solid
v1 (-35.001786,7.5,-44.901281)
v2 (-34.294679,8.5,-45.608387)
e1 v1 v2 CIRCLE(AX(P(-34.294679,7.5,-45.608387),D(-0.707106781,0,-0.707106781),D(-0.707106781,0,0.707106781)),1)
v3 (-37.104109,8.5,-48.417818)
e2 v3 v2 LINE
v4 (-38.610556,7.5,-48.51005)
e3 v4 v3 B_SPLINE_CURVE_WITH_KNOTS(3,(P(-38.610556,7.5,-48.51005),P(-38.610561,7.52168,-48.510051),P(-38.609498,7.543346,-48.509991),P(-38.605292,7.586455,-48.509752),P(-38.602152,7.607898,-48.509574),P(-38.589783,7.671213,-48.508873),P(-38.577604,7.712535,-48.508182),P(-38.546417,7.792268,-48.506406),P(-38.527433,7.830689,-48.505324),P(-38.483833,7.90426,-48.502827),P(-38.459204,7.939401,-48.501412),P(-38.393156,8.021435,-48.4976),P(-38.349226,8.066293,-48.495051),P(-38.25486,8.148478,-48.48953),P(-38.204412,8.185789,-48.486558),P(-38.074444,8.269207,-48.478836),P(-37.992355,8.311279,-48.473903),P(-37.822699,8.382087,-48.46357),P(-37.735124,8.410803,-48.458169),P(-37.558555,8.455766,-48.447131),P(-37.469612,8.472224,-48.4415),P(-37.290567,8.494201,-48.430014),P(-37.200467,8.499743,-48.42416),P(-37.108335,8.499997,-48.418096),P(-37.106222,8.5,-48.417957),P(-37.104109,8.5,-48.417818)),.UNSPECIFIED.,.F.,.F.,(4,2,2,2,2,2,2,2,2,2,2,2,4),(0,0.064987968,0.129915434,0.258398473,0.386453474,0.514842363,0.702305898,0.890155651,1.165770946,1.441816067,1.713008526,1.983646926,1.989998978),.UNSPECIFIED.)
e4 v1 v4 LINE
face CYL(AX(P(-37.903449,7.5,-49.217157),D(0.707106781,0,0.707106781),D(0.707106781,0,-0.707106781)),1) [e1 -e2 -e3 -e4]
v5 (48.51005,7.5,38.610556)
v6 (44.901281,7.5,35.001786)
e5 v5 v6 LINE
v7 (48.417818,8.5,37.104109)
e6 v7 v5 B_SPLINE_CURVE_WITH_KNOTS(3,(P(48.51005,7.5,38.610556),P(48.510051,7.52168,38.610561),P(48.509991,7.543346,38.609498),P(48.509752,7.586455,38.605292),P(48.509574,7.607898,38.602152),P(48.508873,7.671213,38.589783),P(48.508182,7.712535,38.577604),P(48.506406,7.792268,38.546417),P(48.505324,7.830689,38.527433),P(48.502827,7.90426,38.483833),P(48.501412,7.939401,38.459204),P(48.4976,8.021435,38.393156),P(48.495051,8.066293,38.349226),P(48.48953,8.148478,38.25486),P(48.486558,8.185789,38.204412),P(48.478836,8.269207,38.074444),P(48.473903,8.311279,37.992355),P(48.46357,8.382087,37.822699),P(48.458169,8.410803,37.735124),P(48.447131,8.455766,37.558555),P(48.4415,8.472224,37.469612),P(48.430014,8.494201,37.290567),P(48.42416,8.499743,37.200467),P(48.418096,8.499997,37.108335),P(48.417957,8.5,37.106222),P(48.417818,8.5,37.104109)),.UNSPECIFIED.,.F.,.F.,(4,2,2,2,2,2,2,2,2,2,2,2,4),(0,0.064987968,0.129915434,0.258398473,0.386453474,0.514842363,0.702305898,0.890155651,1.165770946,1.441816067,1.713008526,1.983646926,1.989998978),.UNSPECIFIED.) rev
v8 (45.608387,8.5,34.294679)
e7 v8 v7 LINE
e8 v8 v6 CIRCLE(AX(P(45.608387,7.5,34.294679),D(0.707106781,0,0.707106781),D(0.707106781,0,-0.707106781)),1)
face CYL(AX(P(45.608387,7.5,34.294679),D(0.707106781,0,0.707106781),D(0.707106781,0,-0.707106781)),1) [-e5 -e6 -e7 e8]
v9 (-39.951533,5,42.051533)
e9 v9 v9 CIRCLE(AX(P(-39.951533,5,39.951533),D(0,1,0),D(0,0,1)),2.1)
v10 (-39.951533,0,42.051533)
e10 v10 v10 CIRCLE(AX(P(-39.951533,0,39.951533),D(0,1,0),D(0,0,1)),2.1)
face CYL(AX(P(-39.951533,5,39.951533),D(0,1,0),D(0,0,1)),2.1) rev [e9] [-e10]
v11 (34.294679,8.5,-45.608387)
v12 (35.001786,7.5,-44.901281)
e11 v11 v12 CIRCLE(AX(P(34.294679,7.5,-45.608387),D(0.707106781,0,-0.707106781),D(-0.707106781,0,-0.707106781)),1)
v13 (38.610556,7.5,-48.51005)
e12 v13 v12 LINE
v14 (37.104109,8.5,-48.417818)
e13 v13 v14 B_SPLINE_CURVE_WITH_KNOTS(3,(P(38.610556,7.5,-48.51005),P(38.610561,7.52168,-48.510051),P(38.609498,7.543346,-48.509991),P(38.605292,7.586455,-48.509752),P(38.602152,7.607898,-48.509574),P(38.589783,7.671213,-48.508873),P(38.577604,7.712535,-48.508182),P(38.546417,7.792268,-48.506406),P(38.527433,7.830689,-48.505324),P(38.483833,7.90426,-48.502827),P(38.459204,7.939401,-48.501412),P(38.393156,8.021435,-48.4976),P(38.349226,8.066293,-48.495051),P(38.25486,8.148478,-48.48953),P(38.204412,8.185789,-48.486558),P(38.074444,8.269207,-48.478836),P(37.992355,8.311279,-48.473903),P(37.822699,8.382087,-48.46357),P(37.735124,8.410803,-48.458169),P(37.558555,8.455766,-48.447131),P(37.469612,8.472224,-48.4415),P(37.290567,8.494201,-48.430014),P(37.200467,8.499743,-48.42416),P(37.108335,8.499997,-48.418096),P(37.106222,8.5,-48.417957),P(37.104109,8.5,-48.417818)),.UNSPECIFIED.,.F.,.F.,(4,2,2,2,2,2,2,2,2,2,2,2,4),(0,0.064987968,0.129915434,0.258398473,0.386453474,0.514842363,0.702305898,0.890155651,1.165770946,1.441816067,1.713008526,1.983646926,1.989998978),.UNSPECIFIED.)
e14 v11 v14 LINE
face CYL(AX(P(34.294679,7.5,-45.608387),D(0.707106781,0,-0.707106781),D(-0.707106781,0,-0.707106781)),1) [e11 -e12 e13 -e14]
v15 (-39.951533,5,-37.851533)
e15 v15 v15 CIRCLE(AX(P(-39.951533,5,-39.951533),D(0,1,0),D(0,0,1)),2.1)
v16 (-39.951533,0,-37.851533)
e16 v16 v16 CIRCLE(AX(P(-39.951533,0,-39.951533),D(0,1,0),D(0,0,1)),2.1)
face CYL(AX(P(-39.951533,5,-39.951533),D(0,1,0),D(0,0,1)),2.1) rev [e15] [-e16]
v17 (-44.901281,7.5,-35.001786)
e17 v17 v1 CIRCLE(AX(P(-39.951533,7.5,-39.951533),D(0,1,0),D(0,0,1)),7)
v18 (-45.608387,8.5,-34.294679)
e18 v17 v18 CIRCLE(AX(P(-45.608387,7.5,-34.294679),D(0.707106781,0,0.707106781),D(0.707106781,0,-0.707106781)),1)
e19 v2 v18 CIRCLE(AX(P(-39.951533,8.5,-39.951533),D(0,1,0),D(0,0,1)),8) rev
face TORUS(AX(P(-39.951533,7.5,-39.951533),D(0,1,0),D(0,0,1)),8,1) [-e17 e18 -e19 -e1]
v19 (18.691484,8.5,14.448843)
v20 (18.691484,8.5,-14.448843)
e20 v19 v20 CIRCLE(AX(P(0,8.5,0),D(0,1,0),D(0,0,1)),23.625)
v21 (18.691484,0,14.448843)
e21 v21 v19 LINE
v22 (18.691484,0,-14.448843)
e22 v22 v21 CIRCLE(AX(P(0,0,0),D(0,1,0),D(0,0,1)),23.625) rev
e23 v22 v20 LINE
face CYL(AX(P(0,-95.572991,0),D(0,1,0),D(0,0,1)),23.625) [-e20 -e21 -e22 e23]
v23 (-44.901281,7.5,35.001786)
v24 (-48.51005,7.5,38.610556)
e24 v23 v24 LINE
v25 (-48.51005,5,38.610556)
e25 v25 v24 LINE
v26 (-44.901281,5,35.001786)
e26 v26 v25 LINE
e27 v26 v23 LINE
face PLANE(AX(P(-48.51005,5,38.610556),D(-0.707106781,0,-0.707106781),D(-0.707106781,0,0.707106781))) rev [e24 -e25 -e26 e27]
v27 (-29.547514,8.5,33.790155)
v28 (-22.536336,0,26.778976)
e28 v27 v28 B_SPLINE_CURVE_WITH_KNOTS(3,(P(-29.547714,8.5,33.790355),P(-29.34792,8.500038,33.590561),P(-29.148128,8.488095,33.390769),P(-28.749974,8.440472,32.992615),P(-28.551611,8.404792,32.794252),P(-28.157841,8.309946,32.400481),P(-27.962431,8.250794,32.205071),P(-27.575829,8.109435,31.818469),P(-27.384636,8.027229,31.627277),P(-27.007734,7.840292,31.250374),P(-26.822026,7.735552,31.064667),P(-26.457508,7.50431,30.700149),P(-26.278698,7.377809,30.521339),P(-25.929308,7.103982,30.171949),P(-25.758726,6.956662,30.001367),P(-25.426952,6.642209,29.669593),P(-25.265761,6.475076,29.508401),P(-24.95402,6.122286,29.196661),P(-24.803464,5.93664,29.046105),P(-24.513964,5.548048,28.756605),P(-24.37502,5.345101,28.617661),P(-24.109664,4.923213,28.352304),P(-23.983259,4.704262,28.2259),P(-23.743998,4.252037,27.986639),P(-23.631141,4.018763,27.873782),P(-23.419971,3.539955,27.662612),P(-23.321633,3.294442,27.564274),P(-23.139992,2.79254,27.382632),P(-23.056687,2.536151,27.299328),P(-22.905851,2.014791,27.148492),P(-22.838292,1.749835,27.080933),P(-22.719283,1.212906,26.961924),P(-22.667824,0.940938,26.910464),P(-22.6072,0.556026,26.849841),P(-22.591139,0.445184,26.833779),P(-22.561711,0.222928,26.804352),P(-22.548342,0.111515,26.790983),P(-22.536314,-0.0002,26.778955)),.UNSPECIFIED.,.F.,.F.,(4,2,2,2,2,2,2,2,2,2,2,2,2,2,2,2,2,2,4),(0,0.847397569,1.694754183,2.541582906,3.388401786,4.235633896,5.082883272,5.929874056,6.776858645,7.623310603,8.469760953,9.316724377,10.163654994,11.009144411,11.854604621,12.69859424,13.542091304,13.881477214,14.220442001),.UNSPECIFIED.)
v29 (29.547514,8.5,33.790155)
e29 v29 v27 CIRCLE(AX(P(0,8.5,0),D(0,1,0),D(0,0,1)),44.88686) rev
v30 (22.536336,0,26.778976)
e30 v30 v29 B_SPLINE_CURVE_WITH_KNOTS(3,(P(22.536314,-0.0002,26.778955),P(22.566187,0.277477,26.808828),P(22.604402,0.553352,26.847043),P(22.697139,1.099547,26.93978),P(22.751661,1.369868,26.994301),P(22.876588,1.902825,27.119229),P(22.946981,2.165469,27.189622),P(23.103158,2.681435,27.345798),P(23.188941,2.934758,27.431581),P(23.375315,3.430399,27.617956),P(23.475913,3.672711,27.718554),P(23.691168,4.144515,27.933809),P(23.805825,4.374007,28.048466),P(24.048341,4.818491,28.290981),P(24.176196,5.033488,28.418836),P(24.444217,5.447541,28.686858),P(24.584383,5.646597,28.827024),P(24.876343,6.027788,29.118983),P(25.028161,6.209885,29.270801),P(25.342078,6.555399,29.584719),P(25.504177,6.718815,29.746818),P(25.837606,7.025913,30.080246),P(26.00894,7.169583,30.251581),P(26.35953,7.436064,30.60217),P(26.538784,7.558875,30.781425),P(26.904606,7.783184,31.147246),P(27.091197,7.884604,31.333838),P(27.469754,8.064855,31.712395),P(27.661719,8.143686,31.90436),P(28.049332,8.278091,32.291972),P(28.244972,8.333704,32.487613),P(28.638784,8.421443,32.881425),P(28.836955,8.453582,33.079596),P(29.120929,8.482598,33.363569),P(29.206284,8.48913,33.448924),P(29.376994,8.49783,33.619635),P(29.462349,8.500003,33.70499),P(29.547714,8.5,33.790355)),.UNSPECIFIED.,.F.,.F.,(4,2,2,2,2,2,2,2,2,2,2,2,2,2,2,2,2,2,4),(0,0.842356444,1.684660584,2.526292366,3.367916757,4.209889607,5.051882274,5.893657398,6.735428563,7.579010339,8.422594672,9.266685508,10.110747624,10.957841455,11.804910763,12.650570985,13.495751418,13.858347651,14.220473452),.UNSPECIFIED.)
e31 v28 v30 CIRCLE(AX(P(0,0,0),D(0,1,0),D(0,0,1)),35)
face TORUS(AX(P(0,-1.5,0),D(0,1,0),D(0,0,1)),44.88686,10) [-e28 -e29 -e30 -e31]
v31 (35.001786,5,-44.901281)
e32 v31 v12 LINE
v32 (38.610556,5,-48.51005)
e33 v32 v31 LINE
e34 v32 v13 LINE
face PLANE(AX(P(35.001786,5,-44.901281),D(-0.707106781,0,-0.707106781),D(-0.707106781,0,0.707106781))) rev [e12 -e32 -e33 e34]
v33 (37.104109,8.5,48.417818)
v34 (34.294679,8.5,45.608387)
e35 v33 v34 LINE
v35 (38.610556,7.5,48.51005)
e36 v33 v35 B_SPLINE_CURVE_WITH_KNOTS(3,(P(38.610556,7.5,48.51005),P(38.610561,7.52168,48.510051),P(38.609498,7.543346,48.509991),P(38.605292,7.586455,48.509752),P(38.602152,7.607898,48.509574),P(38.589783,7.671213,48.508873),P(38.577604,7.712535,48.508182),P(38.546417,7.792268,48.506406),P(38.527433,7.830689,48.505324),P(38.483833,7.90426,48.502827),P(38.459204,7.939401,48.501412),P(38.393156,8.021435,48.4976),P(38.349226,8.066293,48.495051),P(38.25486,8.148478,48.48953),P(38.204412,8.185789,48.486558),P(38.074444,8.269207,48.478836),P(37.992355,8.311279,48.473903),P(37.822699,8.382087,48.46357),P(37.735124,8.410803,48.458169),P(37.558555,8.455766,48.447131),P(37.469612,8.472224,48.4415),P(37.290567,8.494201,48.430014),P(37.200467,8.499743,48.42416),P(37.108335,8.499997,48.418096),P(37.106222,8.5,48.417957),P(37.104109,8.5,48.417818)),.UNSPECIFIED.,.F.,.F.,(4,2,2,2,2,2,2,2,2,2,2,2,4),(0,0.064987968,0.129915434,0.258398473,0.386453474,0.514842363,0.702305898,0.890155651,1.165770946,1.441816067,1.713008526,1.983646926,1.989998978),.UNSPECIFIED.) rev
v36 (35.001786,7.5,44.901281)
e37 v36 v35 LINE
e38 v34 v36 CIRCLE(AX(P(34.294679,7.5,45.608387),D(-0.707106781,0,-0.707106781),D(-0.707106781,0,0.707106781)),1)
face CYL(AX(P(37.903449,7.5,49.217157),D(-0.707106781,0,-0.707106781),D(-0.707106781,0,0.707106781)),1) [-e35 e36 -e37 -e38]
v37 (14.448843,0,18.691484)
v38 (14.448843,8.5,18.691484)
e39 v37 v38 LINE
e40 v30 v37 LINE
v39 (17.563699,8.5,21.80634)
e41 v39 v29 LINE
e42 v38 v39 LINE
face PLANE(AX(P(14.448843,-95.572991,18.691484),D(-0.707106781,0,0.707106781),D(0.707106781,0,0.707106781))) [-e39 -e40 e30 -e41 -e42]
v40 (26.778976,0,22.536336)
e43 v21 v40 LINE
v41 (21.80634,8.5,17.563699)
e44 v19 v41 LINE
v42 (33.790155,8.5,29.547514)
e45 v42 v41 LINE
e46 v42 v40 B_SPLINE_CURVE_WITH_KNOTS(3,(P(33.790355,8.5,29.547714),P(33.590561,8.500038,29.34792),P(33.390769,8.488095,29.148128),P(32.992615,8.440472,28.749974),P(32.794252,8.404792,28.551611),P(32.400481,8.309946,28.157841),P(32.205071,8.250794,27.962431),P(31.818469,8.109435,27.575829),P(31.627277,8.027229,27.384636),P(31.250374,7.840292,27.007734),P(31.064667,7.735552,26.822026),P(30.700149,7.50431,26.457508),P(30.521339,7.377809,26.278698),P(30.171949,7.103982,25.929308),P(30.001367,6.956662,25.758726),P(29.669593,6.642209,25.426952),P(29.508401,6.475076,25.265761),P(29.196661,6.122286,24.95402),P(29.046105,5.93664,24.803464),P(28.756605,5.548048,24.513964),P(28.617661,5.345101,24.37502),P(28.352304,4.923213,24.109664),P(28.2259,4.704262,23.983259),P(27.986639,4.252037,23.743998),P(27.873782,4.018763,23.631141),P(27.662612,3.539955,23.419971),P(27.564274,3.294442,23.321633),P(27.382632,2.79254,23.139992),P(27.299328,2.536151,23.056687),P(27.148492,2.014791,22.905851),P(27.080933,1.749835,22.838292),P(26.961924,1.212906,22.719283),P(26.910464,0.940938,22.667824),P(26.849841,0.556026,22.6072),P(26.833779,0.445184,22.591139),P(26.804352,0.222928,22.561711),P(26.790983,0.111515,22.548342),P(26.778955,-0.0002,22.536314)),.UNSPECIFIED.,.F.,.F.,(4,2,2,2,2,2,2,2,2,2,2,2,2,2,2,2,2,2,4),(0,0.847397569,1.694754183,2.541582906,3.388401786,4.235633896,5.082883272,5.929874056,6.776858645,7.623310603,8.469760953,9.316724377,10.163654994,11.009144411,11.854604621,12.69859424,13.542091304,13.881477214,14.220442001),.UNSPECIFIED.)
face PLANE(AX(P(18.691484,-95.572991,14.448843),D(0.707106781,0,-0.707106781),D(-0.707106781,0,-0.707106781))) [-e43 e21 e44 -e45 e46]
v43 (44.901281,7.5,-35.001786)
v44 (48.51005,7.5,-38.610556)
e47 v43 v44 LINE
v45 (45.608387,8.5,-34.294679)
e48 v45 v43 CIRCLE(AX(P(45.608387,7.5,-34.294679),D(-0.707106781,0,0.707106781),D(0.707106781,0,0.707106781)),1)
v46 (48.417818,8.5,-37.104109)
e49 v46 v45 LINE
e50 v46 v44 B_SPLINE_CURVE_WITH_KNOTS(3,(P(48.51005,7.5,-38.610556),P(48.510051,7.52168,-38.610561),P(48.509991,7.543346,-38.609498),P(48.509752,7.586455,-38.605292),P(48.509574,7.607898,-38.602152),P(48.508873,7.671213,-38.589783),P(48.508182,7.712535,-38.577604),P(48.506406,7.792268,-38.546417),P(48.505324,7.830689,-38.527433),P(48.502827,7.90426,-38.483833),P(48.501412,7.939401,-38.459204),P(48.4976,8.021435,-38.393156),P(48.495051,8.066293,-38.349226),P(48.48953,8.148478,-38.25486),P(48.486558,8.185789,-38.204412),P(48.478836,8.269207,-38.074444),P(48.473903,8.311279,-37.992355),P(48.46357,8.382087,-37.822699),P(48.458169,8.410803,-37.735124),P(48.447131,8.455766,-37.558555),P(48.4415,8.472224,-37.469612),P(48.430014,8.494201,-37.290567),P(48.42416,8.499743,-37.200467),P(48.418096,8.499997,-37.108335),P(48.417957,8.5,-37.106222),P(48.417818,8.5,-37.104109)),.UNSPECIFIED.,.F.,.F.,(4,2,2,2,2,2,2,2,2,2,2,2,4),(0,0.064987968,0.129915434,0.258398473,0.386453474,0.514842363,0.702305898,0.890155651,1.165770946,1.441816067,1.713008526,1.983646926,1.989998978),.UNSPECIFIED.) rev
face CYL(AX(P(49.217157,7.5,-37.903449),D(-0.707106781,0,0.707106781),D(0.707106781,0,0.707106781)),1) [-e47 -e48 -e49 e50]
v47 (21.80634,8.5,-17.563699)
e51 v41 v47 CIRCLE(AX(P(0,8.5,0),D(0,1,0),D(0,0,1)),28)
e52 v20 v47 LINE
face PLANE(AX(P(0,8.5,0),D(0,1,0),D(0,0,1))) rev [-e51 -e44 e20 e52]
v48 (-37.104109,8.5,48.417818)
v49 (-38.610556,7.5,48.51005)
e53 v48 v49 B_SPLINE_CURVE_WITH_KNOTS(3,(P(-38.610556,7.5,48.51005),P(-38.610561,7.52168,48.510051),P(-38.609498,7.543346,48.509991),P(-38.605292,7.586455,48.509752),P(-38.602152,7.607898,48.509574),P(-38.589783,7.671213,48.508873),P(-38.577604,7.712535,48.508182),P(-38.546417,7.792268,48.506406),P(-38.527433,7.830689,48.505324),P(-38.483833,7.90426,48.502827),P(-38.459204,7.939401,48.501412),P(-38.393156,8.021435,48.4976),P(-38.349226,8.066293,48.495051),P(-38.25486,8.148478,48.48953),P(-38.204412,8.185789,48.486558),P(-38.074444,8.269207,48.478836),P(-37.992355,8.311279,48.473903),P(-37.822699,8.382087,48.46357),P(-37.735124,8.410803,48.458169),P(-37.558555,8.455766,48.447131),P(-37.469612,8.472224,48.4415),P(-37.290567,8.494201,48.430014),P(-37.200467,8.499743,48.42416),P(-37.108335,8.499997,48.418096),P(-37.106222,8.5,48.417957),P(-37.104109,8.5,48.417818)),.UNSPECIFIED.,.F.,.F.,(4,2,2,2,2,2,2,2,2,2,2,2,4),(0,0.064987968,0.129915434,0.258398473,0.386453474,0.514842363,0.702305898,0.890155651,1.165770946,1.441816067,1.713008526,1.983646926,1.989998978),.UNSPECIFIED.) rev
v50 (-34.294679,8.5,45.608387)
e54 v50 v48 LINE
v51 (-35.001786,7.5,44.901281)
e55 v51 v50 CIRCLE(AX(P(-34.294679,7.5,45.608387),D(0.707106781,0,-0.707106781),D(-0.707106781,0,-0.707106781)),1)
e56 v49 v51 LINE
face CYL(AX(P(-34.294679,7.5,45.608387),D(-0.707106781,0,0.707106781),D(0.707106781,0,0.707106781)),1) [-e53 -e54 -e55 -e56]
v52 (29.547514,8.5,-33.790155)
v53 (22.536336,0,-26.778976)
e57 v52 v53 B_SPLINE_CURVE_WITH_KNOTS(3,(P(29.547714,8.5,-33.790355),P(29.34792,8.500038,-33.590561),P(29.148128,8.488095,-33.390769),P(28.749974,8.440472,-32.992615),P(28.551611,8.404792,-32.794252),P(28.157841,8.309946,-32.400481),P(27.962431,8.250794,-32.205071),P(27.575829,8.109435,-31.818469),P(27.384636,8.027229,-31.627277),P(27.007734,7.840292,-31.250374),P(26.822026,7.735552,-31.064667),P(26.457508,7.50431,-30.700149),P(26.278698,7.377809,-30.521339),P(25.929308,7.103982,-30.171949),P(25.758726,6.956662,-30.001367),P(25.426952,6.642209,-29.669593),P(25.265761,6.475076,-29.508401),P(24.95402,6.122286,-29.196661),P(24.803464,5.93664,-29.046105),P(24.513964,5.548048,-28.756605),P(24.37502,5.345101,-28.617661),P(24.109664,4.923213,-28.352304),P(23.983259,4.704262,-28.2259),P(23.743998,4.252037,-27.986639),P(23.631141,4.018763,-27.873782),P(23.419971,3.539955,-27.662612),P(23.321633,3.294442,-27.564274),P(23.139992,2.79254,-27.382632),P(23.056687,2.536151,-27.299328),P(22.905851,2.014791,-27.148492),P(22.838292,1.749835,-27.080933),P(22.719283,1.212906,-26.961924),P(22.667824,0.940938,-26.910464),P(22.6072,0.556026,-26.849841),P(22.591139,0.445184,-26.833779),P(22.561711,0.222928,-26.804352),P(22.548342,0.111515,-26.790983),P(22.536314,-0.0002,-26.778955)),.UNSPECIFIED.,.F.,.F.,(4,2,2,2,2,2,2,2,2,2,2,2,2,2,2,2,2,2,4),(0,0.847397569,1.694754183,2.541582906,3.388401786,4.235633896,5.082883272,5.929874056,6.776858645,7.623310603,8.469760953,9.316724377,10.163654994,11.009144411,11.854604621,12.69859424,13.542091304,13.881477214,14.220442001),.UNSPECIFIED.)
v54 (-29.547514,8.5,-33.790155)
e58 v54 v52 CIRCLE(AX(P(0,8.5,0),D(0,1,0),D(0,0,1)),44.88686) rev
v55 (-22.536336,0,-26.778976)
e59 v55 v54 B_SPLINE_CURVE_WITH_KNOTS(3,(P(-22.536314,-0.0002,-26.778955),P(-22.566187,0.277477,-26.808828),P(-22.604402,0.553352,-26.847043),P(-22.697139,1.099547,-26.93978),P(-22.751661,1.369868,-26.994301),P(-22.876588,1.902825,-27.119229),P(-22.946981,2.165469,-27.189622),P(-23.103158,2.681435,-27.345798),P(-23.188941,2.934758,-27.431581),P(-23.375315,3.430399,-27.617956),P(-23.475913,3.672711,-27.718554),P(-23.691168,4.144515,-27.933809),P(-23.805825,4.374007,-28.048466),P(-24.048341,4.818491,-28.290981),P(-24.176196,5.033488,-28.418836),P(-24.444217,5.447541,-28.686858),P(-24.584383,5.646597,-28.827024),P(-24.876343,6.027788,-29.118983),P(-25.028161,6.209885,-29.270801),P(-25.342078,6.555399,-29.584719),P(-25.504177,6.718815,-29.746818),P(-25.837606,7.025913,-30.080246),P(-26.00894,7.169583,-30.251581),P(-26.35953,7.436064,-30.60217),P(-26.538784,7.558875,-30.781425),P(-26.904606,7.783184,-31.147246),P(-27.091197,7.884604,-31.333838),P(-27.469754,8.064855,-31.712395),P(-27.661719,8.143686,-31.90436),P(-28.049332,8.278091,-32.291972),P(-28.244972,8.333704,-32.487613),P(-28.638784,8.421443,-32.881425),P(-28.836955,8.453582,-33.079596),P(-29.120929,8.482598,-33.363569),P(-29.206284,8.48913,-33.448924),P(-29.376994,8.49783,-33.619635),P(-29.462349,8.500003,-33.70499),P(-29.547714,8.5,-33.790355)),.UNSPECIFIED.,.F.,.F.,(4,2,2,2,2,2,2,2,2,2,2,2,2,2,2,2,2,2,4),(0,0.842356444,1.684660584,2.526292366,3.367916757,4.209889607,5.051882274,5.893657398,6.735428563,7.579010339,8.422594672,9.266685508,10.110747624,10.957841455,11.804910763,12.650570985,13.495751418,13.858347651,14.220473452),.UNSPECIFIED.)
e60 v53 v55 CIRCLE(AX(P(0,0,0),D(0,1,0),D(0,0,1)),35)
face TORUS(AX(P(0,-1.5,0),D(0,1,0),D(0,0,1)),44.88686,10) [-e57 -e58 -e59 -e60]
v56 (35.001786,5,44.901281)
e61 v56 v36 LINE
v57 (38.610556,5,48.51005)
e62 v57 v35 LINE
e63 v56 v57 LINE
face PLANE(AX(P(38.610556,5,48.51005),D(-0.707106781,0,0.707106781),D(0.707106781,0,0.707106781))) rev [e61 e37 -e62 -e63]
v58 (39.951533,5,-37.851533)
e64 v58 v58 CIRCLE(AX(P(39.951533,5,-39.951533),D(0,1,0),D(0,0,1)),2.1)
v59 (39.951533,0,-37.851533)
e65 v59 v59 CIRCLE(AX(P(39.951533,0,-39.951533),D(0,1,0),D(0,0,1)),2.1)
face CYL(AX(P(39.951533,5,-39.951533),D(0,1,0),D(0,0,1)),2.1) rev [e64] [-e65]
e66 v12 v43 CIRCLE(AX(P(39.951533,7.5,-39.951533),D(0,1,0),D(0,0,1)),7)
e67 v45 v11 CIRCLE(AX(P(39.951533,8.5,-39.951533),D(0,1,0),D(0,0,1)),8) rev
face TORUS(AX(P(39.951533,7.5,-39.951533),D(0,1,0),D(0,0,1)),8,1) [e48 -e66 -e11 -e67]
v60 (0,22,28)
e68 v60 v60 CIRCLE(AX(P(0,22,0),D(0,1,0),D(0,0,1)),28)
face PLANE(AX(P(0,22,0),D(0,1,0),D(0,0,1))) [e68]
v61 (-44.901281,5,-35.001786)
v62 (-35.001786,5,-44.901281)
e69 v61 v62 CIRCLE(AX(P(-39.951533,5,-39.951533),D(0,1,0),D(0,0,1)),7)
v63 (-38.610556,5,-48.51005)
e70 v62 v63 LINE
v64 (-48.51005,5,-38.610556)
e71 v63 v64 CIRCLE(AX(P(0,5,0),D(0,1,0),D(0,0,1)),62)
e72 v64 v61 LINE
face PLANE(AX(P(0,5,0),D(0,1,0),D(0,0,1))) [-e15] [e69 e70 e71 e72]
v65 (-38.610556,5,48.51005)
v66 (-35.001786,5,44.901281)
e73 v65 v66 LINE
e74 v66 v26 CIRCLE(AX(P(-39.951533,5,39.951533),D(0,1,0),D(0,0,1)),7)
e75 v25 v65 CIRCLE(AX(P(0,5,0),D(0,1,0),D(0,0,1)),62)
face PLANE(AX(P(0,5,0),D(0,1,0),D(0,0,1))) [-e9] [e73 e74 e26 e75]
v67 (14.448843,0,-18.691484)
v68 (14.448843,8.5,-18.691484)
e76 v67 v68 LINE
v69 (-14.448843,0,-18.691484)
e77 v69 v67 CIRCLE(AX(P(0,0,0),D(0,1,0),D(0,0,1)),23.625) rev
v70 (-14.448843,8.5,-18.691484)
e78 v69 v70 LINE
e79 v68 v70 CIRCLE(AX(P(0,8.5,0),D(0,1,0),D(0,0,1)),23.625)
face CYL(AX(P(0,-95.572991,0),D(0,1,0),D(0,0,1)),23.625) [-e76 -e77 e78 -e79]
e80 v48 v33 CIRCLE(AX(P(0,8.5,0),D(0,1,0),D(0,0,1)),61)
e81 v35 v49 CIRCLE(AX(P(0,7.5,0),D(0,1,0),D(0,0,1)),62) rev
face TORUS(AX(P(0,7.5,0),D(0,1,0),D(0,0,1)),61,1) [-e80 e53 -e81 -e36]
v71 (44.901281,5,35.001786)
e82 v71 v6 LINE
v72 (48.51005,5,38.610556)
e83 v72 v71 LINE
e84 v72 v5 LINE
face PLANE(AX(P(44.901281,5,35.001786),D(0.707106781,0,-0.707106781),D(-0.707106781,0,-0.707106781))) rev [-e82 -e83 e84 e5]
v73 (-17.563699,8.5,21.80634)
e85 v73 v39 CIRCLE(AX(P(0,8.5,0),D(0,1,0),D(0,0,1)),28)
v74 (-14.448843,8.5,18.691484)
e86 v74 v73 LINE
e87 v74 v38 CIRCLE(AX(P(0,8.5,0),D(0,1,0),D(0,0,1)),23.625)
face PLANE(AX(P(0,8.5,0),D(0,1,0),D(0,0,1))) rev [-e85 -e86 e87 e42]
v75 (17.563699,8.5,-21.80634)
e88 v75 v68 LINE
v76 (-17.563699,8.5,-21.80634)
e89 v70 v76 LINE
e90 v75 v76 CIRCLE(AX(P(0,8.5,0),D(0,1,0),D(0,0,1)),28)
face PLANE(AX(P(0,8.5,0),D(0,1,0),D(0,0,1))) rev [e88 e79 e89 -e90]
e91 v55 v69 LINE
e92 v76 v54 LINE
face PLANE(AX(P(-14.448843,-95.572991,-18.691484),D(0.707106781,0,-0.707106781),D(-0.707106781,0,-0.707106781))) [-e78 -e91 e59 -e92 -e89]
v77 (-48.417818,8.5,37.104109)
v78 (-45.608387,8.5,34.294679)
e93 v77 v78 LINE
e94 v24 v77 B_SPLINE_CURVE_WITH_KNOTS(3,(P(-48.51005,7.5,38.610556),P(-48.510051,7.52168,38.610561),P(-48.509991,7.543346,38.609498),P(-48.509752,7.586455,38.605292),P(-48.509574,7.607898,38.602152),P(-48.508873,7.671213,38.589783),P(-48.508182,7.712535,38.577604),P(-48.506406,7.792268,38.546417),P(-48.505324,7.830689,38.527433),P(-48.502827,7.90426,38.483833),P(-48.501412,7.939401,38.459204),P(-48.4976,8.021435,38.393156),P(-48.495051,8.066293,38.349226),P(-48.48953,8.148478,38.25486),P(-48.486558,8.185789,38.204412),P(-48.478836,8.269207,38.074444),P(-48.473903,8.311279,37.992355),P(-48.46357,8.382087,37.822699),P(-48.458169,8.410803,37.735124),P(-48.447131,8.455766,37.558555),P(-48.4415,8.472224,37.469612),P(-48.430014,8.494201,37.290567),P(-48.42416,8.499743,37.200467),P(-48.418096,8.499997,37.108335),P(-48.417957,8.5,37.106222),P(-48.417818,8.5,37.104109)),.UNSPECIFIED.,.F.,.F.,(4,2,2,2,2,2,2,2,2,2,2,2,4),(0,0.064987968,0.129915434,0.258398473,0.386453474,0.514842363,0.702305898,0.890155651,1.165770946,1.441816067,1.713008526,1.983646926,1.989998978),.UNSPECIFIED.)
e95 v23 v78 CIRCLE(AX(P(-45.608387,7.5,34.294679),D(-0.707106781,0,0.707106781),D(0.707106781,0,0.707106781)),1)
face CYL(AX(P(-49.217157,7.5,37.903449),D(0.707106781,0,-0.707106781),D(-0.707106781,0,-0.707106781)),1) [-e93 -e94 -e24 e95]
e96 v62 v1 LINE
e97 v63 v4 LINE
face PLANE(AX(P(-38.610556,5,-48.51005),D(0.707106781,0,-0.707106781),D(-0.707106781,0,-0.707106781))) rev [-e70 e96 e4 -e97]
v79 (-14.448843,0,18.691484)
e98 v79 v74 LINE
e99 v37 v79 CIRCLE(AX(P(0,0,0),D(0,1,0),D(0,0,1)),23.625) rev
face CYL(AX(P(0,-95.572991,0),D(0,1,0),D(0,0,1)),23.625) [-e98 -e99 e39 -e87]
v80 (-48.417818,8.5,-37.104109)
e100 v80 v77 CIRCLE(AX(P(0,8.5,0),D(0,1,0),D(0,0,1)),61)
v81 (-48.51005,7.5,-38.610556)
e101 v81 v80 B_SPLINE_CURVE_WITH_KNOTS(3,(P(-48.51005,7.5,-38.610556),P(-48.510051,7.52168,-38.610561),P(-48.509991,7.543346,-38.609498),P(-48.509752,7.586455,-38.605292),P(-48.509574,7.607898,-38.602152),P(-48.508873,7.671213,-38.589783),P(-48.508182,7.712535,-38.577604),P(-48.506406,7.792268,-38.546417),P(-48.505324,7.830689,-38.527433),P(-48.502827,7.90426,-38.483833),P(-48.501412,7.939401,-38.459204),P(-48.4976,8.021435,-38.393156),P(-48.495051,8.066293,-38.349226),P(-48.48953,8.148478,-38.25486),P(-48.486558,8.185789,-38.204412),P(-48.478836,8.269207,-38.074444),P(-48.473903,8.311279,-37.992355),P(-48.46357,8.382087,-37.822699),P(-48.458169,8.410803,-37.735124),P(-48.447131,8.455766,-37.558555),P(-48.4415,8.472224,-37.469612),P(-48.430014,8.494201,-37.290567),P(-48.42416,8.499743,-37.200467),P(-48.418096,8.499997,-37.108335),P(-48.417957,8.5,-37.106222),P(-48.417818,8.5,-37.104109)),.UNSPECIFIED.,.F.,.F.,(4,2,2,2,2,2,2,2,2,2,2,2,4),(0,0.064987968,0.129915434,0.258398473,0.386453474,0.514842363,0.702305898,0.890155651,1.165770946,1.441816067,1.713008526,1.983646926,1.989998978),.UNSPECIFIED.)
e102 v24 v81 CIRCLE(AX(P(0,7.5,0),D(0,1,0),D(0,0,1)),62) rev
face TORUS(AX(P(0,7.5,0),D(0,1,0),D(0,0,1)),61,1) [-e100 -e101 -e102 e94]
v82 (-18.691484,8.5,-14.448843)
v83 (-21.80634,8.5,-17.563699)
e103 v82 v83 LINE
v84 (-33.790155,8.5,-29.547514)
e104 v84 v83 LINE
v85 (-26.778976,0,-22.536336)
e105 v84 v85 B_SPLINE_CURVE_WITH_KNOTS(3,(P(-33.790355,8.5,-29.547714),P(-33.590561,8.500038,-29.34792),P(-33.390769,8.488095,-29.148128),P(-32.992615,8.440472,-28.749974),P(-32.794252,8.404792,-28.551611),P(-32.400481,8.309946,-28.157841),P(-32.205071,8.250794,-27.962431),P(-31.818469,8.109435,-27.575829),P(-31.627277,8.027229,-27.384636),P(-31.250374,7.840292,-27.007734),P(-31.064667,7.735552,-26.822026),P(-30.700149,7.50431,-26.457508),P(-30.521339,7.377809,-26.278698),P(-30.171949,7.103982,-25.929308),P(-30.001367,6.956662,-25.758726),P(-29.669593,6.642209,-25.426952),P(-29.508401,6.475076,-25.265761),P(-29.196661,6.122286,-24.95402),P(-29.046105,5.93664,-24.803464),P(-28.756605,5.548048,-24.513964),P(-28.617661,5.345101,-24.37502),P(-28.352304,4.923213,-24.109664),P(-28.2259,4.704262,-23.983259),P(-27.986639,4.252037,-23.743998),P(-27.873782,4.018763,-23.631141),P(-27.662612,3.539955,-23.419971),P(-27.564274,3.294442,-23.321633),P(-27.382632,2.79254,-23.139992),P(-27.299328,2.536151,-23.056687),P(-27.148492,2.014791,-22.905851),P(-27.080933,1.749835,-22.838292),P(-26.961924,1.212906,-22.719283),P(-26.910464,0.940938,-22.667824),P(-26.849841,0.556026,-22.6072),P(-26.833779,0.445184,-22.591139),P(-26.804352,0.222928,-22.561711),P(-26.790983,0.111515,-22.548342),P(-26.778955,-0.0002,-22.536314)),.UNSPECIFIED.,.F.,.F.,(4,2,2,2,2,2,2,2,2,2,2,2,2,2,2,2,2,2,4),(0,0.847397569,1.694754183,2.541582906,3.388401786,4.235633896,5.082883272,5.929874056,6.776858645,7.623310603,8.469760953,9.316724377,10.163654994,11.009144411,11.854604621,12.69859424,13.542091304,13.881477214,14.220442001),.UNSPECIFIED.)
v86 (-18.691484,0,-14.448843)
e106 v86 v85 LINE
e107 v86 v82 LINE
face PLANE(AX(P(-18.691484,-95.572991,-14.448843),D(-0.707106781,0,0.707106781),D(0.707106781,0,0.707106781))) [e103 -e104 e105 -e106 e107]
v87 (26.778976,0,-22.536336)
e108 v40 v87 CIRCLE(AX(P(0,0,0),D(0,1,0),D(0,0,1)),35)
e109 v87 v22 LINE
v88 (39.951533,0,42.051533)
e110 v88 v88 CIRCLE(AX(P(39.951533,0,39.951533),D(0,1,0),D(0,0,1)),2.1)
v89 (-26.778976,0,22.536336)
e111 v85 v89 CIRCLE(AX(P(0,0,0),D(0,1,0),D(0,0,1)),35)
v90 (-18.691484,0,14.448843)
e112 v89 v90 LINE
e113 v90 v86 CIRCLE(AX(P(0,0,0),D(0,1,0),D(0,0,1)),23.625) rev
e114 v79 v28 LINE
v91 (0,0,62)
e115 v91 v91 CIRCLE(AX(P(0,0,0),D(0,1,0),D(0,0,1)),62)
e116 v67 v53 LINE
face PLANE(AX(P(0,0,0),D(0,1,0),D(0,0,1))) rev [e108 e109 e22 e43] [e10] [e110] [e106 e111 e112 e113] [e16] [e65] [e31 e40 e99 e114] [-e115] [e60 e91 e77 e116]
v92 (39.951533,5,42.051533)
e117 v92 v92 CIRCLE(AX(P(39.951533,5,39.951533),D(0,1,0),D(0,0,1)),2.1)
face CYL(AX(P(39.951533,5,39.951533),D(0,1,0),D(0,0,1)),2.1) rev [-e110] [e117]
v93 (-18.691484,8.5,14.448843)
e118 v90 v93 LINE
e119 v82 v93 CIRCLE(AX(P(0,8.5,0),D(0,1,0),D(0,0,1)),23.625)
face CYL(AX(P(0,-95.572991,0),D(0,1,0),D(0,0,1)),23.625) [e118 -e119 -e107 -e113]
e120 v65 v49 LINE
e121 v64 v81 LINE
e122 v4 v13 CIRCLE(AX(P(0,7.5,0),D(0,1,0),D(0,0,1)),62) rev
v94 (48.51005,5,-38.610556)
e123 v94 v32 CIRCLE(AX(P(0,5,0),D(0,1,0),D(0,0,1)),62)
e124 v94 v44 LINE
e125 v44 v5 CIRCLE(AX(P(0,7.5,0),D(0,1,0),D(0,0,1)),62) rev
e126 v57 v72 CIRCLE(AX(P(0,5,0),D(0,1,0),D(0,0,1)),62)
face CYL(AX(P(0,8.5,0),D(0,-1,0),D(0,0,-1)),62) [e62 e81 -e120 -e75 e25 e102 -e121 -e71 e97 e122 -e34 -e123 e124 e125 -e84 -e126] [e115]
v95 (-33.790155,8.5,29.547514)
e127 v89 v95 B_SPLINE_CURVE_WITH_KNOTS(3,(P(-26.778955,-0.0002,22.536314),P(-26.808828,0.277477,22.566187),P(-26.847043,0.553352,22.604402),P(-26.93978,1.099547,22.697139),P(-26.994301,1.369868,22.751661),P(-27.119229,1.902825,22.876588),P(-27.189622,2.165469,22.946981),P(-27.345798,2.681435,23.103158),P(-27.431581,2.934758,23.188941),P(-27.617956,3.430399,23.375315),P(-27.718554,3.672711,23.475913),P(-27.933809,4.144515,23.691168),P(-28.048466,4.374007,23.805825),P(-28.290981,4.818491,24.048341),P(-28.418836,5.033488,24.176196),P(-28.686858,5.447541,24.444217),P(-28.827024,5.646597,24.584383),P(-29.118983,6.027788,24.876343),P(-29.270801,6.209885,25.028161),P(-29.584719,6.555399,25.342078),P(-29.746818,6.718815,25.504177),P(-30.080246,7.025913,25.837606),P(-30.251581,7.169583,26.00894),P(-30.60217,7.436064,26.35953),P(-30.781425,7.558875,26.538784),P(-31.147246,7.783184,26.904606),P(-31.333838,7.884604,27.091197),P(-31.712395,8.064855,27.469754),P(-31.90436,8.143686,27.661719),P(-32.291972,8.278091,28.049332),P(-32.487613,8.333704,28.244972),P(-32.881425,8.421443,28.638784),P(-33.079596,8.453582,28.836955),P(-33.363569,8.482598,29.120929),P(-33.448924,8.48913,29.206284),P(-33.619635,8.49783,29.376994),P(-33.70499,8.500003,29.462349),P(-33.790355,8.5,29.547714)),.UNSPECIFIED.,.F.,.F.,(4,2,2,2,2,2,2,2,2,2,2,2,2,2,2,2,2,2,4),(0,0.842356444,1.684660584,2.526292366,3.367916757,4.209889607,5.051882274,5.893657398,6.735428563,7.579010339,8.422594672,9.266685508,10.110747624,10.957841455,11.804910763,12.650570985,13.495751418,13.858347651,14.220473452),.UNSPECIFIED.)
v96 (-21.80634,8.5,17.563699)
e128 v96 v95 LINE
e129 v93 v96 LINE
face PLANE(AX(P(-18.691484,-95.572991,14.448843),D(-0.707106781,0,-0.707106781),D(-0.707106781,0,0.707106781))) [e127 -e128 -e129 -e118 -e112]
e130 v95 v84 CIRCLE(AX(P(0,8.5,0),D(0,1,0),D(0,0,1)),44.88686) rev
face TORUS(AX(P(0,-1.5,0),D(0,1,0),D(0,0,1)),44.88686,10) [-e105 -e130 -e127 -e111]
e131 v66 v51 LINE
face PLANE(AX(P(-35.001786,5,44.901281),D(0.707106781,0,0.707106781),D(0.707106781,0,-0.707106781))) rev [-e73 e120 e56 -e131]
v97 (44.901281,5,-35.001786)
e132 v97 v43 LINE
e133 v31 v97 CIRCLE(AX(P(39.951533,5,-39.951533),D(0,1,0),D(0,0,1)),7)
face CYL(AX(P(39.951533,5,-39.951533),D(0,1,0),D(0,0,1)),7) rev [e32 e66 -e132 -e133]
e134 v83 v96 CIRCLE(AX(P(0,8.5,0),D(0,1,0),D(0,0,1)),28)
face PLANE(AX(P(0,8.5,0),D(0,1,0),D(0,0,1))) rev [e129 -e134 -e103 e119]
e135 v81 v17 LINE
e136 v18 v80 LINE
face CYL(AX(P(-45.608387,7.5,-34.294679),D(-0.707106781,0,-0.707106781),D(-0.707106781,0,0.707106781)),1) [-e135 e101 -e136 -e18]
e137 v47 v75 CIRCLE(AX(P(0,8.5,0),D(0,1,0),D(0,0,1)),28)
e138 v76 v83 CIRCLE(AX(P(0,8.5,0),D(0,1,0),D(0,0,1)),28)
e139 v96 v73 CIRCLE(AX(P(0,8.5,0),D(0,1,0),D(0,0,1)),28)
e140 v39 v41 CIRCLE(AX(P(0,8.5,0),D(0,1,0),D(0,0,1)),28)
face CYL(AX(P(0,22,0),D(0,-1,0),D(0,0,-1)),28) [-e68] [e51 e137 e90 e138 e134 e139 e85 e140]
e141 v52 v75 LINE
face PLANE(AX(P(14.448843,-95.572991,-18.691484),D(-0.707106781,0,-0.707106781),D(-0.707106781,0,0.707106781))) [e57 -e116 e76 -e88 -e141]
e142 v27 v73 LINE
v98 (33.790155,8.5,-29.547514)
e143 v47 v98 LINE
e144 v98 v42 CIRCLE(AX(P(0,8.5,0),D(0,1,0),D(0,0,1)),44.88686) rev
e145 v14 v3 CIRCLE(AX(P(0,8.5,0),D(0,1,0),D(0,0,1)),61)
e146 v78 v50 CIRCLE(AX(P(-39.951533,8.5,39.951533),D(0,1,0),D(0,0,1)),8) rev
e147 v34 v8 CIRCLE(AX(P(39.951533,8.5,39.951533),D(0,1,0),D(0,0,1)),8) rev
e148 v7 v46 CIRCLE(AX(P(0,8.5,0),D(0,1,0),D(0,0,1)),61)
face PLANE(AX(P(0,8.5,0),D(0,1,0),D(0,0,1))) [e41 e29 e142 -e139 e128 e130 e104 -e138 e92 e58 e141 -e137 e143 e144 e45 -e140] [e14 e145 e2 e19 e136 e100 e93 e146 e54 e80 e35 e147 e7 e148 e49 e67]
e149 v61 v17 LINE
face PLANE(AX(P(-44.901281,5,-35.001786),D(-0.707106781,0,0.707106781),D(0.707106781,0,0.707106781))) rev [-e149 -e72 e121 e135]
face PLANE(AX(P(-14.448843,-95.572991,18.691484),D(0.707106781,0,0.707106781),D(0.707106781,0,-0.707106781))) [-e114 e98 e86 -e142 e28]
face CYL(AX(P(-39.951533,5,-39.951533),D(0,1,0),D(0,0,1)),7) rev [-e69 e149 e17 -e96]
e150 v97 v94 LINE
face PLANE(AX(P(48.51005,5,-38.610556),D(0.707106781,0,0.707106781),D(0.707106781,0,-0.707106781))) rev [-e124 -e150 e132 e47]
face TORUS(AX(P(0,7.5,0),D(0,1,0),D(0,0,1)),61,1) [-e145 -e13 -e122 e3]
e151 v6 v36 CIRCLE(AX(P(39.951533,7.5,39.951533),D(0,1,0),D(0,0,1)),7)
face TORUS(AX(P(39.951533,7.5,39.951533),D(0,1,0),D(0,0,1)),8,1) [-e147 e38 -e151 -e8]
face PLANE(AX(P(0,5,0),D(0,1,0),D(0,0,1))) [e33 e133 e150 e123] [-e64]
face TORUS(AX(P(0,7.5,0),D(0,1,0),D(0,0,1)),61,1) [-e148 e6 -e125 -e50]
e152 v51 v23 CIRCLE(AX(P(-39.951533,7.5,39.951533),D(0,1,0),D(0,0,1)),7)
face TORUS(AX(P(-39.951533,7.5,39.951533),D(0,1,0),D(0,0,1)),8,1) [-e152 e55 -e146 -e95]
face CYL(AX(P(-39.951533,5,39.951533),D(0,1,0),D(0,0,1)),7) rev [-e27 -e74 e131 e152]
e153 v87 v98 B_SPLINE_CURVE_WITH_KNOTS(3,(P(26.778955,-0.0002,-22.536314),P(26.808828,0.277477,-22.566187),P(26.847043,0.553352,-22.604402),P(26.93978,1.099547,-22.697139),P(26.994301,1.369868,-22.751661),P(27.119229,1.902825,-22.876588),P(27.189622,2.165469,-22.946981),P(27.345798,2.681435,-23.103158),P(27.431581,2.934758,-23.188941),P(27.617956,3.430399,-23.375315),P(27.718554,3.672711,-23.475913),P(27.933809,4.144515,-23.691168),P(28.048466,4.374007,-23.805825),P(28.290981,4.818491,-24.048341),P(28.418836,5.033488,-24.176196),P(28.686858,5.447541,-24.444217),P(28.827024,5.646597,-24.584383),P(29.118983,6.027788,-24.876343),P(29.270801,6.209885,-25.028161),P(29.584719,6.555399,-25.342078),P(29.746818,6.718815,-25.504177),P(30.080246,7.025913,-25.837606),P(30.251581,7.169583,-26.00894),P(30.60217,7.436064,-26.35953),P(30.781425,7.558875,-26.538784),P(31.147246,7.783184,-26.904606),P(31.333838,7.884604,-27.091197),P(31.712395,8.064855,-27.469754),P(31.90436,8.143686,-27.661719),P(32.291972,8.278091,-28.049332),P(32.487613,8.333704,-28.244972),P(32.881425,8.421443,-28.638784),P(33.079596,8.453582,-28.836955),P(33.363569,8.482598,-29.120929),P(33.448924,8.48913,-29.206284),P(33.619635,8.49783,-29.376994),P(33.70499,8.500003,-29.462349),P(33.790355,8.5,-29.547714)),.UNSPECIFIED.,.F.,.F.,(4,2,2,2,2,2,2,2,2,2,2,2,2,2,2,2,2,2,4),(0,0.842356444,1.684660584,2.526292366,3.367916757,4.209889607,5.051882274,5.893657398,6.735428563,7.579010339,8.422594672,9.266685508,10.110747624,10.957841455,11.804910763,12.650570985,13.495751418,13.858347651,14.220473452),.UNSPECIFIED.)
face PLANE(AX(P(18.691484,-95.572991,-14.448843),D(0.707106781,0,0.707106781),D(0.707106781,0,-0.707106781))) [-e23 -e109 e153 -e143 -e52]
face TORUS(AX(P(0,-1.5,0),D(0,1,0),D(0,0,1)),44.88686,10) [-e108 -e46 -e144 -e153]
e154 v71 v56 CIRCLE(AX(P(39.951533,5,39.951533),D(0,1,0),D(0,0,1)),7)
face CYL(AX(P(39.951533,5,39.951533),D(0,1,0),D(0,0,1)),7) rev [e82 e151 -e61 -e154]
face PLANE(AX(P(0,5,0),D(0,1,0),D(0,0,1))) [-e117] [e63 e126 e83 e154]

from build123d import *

# Parameters (mm, degrees)
SKETCH_1_R            = 62
SKETCH_1_R_2          = 35
EXTRUDE_1_DEPTH       = 8.5
FILLET_1_R            = 10
EXTRUDE_2_DEPTH       = 8.5
SKETCH_3_R            = 28
EXTRUDE_3_DEPTH       = 13.5
CUT_EXTRUDE_START     = -3.5
CUT_EXTRUDE_1_DEPTH   = 3.5
FILLET_2_R            = 1
HOLE_WIZARD_M51_D     = 4.2
HOLE_WIZARD_M51_DEPTH = 14
HOLE_WIZARD_M51_TIP   = 1.2618073


with BuildPart() as part:
    # Эскиз1 → Бобышка-Вытянуть1 (new body)
    with BuildSketch(Plane(origin=(0, 0, 0), x_dir=(1, 0, 0), z_dir=(0, 1, 0))):
        with Locations(Location((0, 0, 0), (0, 0, 270))):
            Circle(SKETCH_1_R)
        with Locations(Location((0, 0, 0), (0, 0, 270))):
            Circle(SKETCH_1_R_2, mode=Mode.SUBTRACT)
    extrude(amount=EXTRUDE_1_DEPTH)

    # Скругление1
    # the kernel refuses this fillet: 10 mm, written as the material it takes off along each edge
    with BuildSketch(Plane(origin=(0, 8.5, 0), x_dir=(0, 0, 1), z_dir=(-1, 0, 0))) as fillet_1_piece_1:
        with BuildLine():
            CenterArc((44.886859967, -10), FILLET_1_R, 90, 81.373073441)
            Line((44.886859967, 0), (44.886859967, 0.2))
            Line((44.886859967, 0.2), (35, 0.2))
            Line((35, 0.2), (34.8, 0))
            ThreePointArc((34.8, 0), (34.8, -4.25), (34.802262801, -8.47))
            Line((34.802262801, -8.47), (35, -8.5))
        make_face()
    revolve(axis=Axis((0, 8.5, 0), (0, 1, 0)), mode=Mode.SUBTRACT)

    # Эскиз2 → Бобышка-Вытянуть2 (add)
    with BuildSketch(Plane(origin=(0, 8.5, 0), x_dir=(1, 0, 0), z_dir=(0, 1, 0))):
        with BuildLine():
            Line((-14.448842978, 18.691483665), (-29.547514476, 33.790155163))
            ThreePointArc((-29.547514476, 33.790155163), (-31.739803069, 31.739803069), (-33.790155163, 29.547514476))
            Line((-33.790155163, 29.547514476), (-18.691483665, 14.448842978))
            ThreePointArc((-18.691483665, 14.448842978), (-23.625, 0), (-18.691483665, -14.448842978))
            Line((-18.691483665, -14.448842978), (-33.790155163, -29.547514476))
            ThreePointArc((-33.790155163, -29.547514476), (-31.739803069, -31.739803069), (-29.547514476, -33.790155163))
            Line((-29.547514476, -33.790155163), (-14.448842978, -18.691483665))
            ThreePointArc((-14.448842978, -18.691483665), (0, -23.625), (14.448842978, -18.691483665))
            Line((14.448842978, -18.691483665), (29.547514476, -33.790155163))
            ThreePointArc((29.547514476, -33.790155163), (31.739803069, -31.739803069), (33.790155163, -29.547514476))
            Line((33.790155163, -29.547514476), (18.691483665, -14.448842978))
            ThreePointArc((18.691483665, -14.448842978), (23.625, 0), (18.691483665, 14.448842978))
            Line((18.691483665, 14.448842978), (33.790155163, 29.547514476))
            ThreePointArc((33.790155163, 29.547514476), (31.739803069, 31.739803069), (29.547514476, 33.790155163))
            Line((29.547514476, 33.790155163), (14.448842978, 18.691483665))
            ThreePointArc((14.448842978, 18.691483665), (0, 23.625), (-14.448842978, 18.691483665))
        make_face()
    extrude(amount=-EXTRUDE_2_DEPTH)

    # Эскиз3 → Бобышка-Вытянуть3 (add)
    with BuildSketch(Plane(origin=(0, 8.5, 0), x_dir=(1, 0, 0), z_dir=(0, 1, 0))):
        with Locations(Location((0, 0, 0), (0, 0, 51.150639828))):
            Circle(SKETCH_3_R)
    extrude(amount=EXTRUDE_3_DEPTH)

    # Эскиз4 → Вырез-Вытянуть1 (cut)
    with BuildSketch(Plane(origin=(0, 8.5, 0), x_dir=(1, 0, 0), z_dir=(0, 1, 0)).offset(CUT_EXTRUDE_START)):
        with BuildLine():
            Line((-48.510050498, -38.610555561), (-44.901280605, -35.001785669))
            ThreePointArc((-44.901280605, -35.001785669), (-35.001785669, -35.001785669), (-35.001785669, -44.901280605))
            Line((-35.001785669, -44.901280605), (-38.610555561, -48.510050498))
            ThreePointArc((-38.610555561, -48.510050498), (-43.840620434, -43.840620434), (-48.510050498, -38.610555561))
        make_face()
        with BuildLine():
            Line((38.610555561, -48.510050498), (35.001785669, -44.901280605))
            ThreePointArc((35.001785669, -44.901280605), (35.001785669, -35.001785669), (44.901280605, -35.001785669))
            Line((44.901280605, -35.001785669), (48.510050498, -38.610555561))
            ThreePointArc((48.510050498, -38.610555561), (43.840620434, -43.840620434), (38.610555561, -48.510050498))
        make_face()
        with BuildLine():
            Line((48.510050498, 38.610555561), (44.901280605, 35.001785669))
            ThreePointArc((44.901280605, 35.001785669), (35.001785669, 35.001785669), (35.001785669, 44.901280605))
            Line((35.001785669, 44.901280605), (38.610555561, 48.510050498))
            ThreePointArc((38.610555561, 48.510050498), (43.840620434, 43.840620434), (48.510050498, 38.610555561))
        make_face()
        with BuildLine():
            Line((-38.610555561, 48.510050498), (-35.001785669, 44.901280605))
            ThreePointArc((-35.001785669, 44.901280605), (-35.001785669, 35.001785669), (-44.901280605, 35.001785669))
            Line((-44.901280605, 35.001785669), (-48.510050498, 38.610555561))
            ThreePointArc((-48.510050498, 38.610555561), (-43.840620434, 43.840620434), (-38.610555561, 48.510050498))
        make_face()
    extrude(amount=CUT_EXTRUDE_1_DEPTH, mode=Mode.SUBTRACT)

    # Скругление2
    fillet_2_edges = [part.edges().sort_by_distance(p)[0] for p in [
        (62, 8.5, 0),
        (0, 8.5, -62),
        (-62, 8.5, 0),
        (-20.449656099, 8.5, 58.530432814),
        (-46.705665551, 8.5, -36.806170615),
        (-35.001785669, 8.5, -35.001785669),
        (-36.806170615, 8.5, -46.705665551),
        (36.806170615, 8.5, -46.705665551),
        (35.001785669, 8.5, -35.001785669),
        (46.705665551, 8.5, -36.806170615),
        (46.705665551, 8.5, 36.806170615),
        (35.001785669, 8.5, 35.001785669),
        (36.806170615, 8.5, 46.705665551),
        (-36.806170615, 8.5, 46.705665551),
        (-35.001785669, 8.5, 35.001785669),
        (-46.705665551, 8.5, 36.806170615),
    ]]
    fillet(fillet_2_edges, radius=FILLET_2_R)

    # Отверстие обработанное метчиком M51
    with Locations(Plane(origin=(0, 5, 0), x_dir=(1, 0, 0), z_dir=(0, 1, 0))):
        with Locations((39.951533137, -39.951533137), (39.951533137, 39.951533137), (-39.951533137, -39.951533137), (-39.951533137, 39.951533137)):
            Hole(HOLE_WIZARD_M51_D / 2, depth=HOLE_WIZARD_M51_DEPTH)
            with Locations((0, 0, -(HOLE_WIZARD_M51_DEPTH + HOLE_WIZARD_M51_TIP / 2))):  # 118° drill point
                Cone(0, HOLE_WIZARD_M51_D / 2, HOLE_WIZARD_M51_TIP, mode=Mode.SUBTRACT)


solid = part.part
